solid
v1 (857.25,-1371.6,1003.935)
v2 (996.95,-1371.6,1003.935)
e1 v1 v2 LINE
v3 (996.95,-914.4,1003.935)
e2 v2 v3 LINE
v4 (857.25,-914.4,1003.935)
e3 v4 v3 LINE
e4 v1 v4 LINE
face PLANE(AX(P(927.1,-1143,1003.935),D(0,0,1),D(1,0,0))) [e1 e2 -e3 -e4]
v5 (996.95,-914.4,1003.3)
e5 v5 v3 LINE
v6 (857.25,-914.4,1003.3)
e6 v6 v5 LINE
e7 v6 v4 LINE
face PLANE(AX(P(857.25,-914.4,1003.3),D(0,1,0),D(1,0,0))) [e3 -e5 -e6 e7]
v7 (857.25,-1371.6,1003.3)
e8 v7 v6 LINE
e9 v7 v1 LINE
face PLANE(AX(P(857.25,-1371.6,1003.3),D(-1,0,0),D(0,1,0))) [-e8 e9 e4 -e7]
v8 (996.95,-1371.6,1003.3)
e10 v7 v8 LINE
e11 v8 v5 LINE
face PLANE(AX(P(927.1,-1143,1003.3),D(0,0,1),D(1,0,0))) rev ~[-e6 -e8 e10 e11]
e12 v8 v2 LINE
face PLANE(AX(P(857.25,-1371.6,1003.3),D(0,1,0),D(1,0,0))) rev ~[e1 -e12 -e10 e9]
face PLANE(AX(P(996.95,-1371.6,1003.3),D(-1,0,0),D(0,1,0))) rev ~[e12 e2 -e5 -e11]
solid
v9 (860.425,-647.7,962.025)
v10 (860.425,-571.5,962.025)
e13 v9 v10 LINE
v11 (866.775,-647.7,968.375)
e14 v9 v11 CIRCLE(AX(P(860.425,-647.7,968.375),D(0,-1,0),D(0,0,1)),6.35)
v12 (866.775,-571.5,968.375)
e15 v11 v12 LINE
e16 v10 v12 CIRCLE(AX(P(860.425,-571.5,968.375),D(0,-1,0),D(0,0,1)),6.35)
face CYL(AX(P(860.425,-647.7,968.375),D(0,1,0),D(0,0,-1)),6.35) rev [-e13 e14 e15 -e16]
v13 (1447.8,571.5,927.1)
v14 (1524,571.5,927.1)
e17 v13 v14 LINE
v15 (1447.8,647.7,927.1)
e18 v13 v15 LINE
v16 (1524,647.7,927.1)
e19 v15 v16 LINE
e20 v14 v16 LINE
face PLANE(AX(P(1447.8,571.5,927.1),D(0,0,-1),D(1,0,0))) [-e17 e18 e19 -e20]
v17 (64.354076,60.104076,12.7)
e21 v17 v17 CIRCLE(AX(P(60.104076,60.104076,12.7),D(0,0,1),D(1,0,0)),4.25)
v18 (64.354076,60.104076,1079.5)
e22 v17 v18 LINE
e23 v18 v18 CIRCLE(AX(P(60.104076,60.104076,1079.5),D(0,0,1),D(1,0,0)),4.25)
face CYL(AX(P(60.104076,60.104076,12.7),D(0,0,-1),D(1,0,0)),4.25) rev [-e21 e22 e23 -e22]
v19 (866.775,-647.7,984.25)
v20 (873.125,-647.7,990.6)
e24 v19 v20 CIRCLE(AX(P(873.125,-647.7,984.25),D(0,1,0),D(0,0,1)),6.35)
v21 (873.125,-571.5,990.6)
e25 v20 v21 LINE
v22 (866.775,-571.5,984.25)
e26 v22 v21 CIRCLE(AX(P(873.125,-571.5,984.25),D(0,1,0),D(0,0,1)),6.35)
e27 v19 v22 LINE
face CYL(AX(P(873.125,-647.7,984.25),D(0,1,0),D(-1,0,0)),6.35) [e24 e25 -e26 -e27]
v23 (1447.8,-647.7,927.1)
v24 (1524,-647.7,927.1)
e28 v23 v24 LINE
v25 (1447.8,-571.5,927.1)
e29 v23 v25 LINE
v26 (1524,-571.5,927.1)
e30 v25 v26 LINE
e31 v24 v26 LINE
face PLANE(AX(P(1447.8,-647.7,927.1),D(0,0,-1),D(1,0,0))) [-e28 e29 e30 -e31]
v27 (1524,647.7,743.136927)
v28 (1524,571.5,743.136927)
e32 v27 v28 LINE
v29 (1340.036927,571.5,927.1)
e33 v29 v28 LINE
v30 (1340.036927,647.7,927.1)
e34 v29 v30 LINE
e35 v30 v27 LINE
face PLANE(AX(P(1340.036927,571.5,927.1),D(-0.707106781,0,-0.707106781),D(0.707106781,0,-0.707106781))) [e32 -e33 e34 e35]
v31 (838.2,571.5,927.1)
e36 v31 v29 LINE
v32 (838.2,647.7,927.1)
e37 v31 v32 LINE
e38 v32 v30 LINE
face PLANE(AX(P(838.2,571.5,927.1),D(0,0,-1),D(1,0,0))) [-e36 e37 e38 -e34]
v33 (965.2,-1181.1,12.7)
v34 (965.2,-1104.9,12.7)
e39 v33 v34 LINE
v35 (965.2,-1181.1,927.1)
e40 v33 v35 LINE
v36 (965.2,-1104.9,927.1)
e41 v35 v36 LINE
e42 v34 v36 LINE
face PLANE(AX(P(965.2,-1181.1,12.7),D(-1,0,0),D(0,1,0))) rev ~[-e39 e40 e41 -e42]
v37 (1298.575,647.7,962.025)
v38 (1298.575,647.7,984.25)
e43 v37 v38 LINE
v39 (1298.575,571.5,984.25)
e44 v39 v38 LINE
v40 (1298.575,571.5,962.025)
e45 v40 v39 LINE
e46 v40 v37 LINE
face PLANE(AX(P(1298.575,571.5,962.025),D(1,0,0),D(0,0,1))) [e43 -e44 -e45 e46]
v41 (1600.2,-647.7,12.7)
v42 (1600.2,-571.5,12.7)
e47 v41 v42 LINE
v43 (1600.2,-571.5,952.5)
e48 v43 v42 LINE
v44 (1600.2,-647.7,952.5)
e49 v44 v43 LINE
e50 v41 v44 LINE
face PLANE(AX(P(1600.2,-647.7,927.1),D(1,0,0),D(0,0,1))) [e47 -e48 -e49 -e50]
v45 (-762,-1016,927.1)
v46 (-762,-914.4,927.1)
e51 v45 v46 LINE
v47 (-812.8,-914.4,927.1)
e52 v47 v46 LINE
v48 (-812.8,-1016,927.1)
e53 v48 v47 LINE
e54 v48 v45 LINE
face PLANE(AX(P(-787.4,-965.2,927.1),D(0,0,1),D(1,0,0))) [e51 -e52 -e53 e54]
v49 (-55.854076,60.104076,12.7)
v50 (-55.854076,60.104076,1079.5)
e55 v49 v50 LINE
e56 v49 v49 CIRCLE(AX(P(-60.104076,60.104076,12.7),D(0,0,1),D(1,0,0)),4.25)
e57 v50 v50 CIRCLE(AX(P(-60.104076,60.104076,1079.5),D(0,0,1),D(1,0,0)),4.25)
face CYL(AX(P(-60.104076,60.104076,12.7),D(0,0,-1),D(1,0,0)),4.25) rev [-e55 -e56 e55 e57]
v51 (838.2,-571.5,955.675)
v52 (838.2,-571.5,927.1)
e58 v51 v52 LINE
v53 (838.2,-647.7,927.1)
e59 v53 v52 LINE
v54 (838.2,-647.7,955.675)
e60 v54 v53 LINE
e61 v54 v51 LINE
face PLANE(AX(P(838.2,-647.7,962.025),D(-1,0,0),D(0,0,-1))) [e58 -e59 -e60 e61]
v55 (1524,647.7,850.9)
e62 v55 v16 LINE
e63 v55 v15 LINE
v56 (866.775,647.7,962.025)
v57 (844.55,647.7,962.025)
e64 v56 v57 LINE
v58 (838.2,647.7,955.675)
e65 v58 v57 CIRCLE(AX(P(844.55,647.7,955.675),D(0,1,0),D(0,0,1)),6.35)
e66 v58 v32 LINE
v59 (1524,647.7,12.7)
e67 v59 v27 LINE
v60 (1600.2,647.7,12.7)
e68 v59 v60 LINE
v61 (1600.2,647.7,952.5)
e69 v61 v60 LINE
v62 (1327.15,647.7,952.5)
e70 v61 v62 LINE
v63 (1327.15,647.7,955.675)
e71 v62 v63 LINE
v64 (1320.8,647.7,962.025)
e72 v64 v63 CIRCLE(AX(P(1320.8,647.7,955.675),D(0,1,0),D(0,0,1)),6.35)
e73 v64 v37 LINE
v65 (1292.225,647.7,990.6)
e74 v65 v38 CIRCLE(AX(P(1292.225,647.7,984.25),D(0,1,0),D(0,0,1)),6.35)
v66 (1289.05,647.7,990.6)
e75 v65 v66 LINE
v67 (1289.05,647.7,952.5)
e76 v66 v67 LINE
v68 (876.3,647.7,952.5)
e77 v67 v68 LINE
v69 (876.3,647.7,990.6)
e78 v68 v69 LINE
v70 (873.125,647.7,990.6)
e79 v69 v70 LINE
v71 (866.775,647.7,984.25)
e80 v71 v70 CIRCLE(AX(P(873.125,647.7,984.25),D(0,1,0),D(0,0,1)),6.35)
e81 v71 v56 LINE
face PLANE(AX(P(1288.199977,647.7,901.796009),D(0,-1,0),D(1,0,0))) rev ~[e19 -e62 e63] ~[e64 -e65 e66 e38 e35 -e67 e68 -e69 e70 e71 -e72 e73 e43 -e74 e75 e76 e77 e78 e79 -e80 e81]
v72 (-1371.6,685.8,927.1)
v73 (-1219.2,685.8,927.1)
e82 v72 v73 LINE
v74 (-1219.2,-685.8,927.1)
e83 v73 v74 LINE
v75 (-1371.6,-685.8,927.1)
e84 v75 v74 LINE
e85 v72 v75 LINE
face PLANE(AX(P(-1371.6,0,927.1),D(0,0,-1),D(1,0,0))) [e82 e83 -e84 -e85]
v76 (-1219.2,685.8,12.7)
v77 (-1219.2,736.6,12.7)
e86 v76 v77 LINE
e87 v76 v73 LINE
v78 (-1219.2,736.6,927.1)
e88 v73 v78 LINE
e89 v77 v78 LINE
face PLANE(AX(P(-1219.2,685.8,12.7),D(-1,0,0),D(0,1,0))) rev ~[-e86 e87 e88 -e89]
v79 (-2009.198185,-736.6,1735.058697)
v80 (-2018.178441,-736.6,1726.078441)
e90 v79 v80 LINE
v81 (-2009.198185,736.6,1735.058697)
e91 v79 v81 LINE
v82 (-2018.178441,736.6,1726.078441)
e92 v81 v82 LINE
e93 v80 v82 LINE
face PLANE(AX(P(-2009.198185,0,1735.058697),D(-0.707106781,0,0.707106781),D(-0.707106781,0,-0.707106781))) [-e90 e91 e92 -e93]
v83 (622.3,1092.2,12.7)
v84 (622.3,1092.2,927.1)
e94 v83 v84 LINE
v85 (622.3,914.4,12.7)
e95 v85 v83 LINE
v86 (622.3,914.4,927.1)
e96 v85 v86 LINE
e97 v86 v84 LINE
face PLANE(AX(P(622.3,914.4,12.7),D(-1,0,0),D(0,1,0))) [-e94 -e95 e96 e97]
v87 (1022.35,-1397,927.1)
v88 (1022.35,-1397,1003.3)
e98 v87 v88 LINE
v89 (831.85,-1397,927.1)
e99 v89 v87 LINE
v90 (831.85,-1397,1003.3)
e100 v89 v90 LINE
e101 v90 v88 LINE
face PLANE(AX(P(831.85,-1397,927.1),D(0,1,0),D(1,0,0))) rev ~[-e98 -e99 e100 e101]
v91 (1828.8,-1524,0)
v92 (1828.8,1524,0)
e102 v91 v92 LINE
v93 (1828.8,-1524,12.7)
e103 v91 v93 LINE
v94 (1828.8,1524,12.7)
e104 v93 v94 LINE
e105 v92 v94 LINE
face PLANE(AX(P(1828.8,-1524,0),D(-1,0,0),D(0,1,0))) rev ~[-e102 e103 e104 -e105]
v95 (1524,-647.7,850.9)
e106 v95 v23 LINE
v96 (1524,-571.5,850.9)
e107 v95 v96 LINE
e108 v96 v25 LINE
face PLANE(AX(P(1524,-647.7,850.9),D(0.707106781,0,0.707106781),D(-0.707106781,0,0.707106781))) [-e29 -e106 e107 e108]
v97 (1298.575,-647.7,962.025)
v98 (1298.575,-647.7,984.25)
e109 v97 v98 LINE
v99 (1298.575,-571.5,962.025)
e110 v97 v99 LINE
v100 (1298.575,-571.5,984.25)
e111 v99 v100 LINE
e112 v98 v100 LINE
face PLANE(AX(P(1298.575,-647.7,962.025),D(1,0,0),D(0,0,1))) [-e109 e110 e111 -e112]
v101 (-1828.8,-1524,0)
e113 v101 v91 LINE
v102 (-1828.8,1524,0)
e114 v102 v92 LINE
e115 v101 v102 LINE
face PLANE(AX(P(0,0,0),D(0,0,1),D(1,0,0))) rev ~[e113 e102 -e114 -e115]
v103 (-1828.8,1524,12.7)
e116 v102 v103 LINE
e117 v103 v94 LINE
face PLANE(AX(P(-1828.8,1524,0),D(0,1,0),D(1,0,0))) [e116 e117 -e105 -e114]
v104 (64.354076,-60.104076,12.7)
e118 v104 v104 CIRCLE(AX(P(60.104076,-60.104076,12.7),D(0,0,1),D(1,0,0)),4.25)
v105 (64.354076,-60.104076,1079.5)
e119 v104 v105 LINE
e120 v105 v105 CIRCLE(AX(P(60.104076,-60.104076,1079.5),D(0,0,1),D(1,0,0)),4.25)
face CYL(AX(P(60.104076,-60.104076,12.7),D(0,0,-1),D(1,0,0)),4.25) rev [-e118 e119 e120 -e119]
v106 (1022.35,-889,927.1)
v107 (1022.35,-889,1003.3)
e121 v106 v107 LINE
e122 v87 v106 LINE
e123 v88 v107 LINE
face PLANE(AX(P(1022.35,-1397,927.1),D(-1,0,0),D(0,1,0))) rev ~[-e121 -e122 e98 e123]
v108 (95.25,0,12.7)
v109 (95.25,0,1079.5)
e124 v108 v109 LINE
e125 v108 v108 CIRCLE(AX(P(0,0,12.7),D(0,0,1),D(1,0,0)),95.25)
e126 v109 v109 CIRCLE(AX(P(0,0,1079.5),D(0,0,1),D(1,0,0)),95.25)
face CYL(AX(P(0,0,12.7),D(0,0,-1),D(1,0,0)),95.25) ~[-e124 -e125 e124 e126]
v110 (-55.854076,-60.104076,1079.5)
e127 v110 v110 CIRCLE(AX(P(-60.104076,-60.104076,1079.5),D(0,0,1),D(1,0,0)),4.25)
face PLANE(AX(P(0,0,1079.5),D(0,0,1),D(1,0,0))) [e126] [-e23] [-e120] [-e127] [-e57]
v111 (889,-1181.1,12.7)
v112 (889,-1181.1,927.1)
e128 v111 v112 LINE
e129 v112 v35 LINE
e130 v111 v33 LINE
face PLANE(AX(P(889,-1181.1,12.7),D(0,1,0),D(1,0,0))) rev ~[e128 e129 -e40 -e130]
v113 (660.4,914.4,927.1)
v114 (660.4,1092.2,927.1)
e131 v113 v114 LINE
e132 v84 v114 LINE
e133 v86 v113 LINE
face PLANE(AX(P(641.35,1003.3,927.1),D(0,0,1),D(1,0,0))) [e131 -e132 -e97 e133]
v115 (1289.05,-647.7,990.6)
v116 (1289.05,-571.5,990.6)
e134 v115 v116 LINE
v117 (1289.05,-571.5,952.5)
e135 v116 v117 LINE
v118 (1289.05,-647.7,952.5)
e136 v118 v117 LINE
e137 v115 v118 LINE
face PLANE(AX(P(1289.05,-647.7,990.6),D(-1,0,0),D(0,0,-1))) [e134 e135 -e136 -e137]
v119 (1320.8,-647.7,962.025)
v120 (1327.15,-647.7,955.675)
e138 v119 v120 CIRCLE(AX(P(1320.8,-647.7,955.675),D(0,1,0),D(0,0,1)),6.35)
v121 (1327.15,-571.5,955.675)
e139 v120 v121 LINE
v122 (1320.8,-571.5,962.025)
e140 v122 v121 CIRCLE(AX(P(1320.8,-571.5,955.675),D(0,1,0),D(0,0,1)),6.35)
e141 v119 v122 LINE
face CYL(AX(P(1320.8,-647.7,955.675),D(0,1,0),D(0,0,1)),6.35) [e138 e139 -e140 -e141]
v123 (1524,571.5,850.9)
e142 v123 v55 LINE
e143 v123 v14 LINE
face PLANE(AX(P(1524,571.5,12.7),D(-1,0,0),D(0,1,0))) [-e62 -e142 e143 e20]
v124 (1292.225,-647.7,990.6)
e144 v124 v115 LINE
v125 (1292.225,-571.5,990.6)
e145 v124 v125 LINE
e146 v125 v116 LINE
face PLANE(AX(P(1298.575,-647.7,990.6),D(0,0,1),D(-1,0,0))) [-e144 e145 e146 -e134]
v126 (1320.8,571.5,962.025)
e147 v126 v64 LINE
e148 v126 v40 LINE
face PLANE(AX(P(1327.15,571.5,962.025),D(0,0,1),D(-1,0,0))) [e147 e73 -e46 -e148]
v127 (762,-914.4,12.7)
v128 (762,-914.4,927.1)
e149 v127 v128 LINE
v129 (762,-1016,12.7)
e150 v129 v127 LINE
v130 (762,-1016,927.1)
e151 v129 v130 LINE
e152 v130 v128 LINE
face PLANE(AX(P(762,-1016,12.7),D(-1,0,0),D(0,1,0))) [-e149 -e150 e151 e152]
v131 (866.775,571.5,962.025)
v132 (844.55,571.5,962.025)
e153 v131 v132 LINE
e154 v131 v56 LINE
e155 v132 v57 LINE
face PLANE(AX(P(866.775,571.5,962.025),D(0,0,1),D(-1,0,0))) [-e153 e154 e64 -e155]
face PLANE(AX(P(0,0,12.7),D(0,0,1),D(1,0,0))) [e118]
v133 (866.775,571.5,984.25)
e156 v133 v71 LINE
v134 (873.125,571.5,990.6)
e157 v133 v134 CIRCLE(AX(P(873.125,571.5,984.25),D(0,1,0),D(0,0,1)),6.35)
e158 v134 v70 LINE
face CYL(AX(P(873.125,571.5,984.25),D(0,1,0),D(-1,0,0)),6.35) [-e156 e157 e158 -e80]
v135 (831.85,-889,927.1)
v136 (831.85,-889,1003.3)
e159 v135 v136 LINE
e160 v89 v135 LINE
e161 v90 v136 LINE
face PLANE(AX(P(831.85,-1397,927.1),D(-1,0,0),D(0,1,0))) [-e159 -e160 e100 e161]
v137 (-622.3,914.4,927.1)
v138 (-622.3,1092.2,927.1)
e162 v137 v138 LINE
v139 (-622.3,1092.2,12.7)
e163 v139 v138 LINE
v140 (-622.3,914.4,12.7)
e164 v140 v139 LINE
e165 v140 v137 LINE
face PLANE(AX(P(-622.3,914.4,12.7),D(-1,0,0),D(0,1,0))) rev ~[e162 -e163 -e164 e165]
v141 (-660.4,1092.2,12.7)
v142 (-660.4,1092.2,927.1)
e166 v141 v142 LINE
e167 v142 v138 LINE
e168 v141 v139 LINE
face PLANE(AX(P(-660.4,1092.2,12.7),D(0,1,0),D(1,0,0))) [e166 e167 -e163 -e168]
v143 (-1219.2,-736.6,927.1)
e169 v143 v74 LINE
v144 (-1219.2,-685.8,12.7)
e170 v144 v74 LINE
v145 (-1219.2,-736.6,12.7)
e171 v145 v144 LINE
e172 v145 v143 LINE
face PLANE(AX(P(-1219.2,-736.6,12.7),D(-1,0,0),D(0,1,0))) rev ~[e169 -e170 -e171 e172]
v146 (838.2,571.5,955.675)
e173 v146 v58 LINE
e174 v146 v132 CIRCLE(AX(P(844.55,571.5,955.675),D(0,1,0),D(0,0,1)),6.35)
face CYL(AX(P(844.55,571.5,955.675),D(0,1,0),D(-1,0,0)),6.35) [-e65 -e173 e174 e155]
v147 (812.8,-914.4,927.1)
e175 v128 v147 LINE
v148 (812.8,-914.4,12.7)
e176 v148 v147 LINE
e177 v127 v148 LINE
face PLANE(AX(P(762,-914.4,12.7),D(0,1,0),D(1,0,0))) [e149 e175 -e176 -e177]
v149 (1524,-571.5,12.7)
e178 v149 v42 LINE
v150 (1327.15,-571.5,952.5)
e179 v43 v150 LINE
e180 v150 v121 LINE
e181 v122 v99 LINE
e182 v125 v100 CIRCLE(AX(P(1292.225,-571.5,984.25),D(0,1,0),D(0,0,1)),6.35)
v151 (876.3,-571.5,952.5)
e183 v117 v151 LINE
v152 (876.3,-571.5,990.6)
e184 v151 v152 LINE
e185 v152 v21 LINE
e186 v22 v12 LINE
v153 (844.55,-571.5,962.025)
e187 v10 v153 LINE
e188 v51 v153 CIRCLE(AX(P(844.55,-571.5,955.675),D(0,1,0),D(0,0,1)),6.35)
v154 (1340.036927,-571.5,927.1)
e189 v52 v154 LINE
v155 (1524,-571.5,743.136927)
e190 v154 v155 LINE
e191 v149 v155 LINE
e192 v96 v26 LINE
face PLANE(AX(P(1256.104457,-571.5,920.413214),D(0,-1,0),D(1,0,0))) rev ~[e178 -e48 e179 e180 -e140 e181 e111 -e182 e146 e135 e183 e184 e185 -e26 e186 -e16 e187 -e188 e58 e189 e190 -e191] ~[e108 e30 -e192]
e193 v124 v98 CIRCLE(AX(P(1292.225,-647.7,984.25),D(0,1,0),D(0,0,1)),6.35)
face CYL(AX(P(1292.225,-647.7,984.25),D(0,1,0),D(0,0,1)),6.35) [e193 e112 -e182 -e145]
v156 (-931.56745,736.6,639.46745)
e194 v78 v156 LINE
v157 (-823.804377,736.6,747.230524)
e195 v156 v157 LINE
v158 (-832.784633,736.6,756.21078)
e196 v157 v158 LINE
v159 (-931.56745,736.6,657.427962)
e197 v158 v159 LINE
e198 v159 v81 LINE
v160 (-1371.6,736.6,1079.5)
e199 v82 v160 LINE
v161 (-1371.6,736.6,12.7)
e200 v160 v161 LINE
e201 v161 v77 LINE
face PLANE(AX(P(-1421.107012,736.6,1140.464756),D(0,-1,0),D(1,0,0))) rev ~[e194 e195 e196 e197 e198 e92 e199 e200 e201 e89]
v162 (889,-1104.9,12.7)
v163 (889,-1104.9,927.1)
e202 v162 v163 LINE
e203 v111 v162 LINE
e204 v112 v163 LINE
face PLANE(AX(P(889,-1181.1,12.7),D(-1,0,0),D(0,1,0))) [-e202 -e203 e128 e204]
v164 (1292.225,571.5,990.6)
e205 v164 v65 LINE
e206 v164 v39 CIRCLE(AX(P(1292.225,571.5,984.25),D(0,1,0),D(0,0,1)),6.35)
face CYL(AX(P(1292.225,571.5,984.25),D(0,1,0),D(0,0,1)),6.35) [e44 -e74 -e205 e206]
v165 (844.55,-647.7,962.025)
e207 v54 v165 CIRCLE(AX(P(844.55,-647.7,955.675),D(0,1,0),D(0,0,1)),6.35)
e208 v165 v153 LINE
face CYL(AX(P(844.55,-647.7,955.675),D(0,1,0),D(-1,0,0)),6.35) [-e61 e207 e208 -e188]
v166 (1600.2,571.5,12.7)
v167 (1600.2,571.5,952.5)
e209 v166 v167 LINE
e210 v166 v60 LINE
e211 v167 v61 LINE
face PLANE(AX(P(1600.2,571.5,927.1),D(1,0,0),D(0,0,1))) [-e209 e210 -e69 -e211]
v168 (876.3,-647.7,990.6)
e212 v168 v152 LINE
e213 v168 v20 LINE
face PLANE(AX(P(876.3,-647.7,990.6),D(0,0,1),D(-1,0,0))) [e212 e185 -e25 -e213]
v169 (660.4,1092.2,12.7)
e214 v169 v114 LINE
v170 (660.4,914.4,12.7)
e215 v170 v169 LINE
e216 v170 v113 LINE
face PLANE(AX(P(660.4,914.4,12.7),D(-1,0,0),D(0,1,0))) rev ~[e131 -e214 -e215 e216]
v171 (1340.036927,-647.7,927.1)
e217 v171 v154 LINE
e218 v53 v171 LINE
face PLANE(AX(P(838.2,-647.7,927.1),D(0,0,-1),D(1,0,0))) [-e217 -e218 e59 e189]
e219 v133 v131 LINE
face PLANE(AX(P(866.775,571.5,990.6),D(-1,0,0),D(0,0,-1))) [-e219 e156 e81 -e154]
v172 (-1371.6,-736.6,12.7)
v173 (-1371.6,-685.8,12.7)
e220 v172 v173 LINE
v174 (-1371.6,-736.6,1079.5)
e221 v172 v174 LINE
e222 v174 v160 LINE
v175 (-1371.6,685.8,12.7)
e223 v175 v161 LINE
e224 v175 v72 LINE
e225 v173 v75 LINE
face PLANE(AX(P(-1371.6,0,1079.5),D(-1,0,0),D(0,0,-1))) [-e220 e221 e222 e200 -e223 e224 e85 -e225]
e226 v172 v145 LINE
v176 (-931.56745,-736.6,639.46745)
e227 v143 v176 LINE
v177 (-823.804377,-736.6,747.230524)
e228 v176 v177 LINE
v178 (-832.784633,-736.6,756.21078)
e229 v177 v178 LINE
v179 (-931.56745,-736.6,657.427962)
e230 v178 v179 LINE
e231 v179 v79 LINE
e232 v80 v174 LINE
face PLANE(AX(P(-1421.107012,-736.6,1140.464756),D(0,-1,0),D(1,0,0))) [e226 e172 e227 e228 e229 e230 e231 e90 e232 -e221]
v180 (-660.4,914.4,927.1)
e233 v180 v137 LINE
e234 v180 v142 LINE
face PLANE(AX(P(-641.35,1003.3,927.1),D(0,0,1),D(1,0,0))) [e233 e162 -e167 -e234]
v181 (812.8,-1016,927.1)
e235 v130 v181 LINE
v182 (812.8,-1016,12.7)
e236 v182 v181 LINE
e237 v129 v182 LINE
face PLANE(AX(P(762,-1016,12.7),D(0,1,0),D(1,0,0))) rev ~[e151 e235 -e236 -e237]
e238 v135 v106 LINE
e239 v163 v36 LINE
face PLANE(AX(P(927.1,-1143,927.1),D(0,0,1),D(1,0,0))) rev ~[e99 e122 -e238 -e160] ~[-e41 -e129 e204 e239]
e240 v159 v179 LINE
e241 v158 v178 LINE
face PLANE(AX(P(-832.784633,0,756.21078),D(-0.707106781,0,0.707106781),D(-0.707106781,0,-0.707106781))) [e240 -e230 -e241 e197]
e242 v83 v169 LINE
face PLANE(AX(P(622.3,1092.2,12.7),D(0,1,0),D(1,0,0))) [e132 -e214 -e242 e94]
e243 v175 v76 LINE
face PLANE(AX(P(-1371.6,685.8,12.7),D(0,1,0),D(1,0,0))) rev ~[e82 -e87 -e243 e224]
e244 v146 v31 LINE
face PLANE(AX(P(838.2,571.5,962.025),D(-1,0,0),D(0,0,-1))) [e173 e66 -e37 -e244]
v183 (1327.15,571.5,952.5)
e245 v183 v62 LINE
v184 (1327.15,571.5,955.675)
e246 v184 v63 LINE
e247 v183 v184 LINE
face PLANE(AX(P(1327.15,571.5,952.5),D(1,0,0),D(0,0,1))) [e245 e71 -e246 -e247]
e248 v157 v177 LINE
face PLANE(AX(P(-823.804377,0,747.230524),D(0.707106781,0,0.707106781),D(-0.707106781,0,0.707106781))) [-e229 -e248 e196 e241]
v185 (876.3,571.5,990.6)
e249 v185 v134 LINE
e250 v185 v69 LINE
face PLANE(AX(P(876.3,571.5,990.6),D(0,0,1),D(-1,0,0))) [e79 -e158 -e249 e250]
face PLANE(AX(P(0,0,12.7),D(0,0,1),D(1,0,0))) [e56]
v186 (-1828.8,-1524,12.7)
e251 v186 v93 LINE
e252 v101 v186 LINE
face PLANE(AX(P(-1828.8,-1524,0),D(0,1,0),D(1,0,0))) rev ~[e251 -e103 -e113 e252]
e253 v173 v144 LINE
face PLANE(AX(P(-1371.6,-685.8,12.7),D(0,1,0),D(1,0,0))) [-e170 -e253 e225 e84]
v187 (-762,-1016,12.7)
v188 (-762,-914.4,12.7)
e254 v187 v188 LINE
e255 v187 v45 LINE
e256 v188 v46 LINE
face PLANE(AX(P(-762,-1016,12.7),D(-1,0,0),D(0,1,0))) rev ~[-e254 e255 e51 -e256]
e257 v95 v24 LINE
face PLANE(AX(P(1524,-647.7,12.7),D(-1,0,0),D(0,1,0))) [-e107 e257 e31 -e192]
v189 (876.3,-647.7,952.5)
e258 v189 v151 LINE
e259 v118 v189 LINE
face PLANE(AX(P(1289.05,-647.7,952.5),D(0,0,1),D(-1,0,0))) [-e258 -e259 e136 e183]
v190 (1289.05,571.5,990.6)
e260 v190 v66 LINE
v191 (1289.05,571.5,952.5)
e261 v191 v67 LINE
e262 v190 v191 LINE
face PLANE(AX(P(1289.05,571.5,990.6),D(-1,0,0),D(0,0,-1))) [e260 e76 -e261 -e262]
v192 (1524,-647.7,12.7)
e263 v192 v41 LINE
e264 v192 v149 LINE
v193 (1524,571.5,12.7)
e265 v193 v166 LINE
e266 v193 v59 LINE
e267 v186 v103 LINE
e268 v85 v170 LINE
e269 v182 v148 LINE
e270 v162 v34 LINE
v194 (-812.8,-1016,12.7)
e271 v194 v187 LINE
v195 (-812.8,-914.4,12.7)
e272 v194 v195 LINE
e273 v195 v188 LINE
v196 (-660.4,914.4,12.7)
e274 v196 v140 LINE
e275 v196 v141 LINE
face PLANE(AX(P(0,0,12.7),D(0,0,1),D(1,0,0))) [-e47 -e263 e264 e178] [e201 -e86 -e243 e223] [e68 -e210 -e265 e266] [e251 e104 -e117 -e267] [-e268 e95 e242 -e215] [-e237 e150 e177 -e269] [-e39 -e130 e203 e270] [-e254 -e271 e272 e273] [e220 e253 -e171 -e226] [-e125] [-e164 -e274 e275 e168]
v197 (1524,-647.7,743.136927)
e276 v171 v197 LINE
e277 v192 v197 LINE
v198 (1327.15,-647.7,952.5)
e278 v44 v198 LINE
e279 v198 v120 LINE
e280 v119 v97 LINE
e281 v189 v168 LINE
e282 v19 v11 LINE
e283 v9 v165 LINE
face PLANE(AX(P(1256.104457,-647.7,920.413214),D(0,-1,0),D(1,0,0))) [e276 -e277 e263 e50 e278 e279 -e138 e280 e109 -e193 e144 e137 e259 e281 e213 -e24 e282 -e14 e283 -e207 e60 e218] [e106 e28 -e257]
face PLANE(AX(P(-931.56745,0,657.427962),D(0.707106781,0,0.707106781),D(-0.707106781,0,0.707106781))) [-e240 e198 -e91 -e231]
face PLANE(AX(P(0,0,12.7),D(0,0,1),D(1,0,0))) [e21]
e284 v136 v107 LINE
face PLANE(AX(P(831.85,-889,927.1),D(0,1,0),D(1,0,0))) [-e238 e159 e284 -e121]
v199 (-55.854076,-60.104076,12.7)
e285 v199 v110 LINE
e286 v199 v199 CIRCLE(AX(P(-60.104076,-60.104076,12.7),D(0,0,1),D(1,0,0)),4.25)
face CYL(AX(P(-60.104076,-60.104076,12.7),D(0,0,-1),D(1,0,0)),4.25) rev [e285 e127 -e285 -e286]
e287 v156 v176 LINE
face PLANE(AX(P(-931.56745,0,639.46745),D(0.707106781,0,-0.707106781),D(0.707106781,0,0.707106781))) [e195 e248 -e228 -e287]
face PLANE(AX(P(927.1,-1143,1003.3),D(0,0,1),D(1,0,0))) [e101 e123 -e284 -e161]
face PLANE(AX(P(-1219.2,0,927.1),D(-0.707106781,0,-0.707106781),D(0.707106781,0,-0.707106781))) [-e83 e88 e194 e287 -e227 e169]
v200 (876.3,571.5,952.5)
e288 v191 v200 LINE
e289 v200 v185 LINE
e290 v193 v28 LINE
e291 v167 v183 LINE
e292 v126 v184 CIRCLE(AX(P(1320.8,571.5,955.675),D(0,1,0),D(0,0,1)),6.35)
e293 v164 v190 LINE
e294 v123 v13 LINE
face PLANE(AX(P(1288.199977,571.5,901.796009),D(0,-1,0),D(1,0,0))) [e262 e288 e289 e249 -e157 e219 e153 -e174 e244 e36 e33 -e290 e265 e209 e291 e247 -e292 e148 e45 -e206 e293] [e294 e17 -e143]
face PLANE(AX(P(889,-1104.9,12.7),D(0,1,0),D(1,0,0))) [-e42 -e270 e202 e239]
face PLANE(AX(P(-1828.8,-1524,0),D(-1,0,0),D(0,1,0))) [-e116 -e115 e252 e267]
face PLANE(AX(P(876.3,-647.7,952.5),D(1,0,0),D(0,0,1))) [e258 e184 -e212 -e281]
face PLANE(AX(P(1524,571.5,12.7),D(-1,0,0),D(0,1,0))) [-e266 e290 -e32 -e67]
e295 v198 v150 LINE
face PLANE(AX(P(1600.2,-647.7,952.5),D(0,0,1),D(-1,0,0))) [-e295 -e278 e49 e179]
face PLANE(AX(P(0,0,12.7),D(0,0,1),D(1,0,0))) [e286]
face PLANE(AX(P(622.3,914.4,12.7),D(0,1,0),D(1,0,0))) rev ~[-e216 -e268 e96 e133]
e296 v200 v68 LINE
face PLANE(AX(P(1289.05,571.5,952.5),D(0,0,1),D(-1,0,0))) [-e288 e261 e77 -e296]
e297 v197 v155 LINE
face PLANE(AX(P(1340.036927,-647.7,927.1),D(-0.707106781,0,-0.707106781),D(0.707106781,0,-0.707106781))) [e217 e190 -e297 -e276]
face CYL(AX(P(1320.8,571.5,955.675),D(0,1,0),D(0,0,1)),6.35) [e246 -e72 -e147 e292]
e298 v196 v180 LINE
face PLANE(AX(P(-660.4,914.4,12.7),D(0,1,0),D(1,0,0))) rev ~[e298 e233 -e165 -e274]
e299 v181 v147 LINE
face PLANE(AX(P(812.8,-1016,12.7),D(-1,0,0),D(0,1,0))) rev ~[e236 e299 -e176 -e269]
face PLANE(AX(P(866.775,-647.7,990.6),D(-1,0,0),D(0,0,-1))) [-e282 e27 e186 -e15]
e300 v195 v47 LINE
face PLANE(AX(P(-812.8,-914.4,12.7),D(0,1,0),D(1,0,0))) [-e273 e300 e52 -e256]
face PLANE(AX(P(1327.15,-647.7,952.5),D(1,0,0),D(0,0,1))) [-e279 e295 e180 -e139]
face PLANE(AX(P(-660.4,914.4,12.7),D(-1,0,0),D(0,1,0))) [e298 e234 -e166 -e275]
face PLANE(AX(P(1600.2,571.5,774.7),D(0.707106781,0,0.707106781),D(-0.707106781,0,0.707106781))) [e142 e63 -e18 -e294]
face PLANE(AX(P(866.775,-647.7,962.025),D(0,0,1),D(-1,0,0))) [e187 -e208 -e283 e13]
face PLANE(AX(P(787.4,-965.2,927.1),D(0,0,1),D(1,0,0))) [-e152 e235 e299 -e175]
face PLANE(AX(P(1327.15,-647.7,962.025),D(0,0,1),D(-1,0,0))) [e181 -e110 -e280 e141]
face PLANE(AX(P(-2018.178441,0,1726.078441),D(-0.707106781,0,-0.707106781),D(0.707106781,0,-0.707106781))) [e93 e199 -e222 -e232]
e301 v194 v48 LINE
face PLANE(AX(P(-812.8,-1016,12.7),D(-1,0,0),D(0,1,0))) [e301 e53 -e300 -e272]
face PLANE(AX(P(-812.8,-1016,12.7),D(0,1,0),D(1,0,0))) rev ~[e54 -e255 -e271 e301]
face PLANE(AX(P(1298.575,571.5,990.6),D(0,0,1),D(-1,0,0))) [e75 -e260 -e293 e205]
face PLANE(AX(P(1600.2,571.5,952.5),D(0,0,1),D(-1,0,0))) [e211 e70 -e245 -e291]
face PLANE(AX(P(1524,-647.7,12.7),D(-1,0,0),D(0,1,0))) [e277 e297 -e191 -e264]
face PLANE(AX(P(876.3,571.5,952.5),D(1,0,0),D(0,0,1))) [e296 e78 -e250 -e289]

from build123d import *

# Parameters (mm, degrees)
F0_W          = 3657.6
F0_H          = 3048
F1_DEPTH      = 12.7
F2_R          = 95.25
F2_R_2        = 4.25
F3_DEPTH      = 1066.8
F4_W          = 38.1
F4_H          = 177.8
F4_W_2        = 50.8
F4_H_2        = 101.6
F4_W_3        = 76.2
F4_H_3        = 76.2
F5_DEPTH      = 914.4
F6_W          = 152.4
F6_H          = 50.8
F7_DEPTH      = 914.4
F9_DEPTH      = 736.6
F9_DEPTH_BACK = 736.6
F11_DEPTH     = 76.2
F13_DEPTH     = 76.2
F14_R         = 6.35
F15_W         = 190.5
F15_H         = 508
F16_DEPTH     = 76.2
F17_W         = 139.7
F17_H         = 457.2
F18_DEPTH     = 0.635


with BuildPart() as f1:
    # F0 (on Top) → F1 (new body)
    with BuildSketch(Plane.XY):
        Rectangle(F0_W, F0_H)
    extrude(amount=F1_DEPTH)

    # F2 (on face) → F3 (join)
    with BuildSketch(Plane.XY.offset(12.7)):
        Circle(F2_R)
        with Locations((-60.1040764009, -60.1040764009)):
            Circle(F2_R_2, mode=Mode.SUBTRACT)
        with Locations((60.1040764009, -60.1040764009)):
            Circle(F2_R_2, mode=Mode.SUBTRACT)
        with Locations((-60.1040764009, 60.1040764009)):
            Circle(F2_R_2, mode=Mode.SUBTRACT)
        with Locations((60.1040764009, 60.1040764009)):
            Circle(F2_R_2, mode=Mode.SUBTRACT)
    extrude(amount=F3_DEPTH)

    # F4 (on face) → F5 (join)
    with BuildSketch(Plane.XY.offset(12.7)):
        with Locations((-641.35, 1003.3)):
            Rectangle(F4_W, F4_H)
        with Locations((641.35, 1003.3)):
            Rectangle(F4_W, F4_H)
        with Locations((-787.4, -965.2)):
            Rectangle(F4_W_2, F4_H_2)
        with Locations((787.4, -965.2)):
            Rectangle(F4_W_2, F4_H_2)
        with Locations((1562.1, 609.6)):
            Rectangle(F4_W_3, F4_H_3)
        with Locations((1562.1, -609.6)):
            Rectangle(F4_W_3, F4_H_3)
        with Locations((927.1, -1143)):
            Rectangle(F4_W_3, F4_H_3)
    extrude(amount=F5_DEPTH)

    # F6 (on face) → F7 (join)
    with BuildSketch(Plane.XY.offset(12.7)):
        with Locations((-1295.4, 711.2)):
            Rectangle(F6_W, F6_H)
        with Locations((-1295.4, -711.2)):
            Rectangle(F6_W, F6_H)
    extrude(amount=F7_DEPTH)

    # F8 (on Front) → F9 (join, two sides)
    with BuildSketch(Plane.XZ) as f9_sk:
        Polygon((-1371.6, 1079.5), (-1371.6, 927.1), (-1219.2, 927.1), (-931.5674500676, 639.4674500676), (-823.8043766148, 747.2305235204), (-832.7846327359, 756.2107796415), (-931.5674500676, 657.4279623097), (-2009.1981845959, 1735.058696838), (-2018.178440717, 1726.078440717), align=None)
    extrude(amount=F9_DEPTH)
    extrude(f9_sk.sketch, amount=-F9_DEPTH_BACK)

    # F10 (on face) → F11 (join, through all)
    with BuildSketch(Plane.XZ.offset(647.7)):
        Polygon((1447.8, 927.1), (1600.2, 927.1), (1600.2, 952.5), (1327.15, 952.5), (1327.15, 962.025), (1298.575, 962.025), (1298.575, 990.6), (1289.05, 990.6), (1289.05, 952.5), (876.3, 952.5), (876.3, 990.6), (866.775, 990.6), (866.775, 962.025), (838.2, 962.025), (838.2, 927.1), (1340.0369265472, 927.1), (1524, 743.1369265472), (1524, 850.9), align=None)
    extrude(amount=-F11_DEPTH)

    # F12 (on face) → F13 (join, through all)
    with BuildSketch(Plane.XZ.offset(-571.5)):
        Polygon((1447.8, 927.1), (1600.2, 927.1), (1600.2, 952.5), (1327.15, 952.5), (1327.15, 962.025), (1298.575, 962.025), (1298.575, 990.6), (1289.05, 990.6), (1289.05, 952.5), (876.3, 952.5), (876.3, 990.6), (866.775, 990.6), (866.775, 962.025), (838.2, 962.025), (838.2, 927.1), (1340.0369265472, 927.1), (1600.2, 666.9369265472), (1600.2, 774.7), align=None)
    extrude(amount=-F13_DEPTH)

    # F14
    f14_edges = [f1.edges().sort_by_distance(p)[0] for p in [
        (866.775, -609.6, 990.6),
        (1298.575, -609.6, 990.6),
        (1327.15, -609.6, 962.025),
        (866.775, 609.6, 990.6),
        (838.2, 609.6, 962.025),
        (1298.575, 609.6, 990.6),
        (1327.15, 609.6, 962.025),
        (866.775, -609.6, 962.025),
        (838.2, -609.6, 962.025),
    ]]
    fillet(f14_edges, radius=F14_R)

    # F15 (on face) → F16 (join)
    with BuildSketch(Plane.XY.offset(927.1)):
        with Locations((927.1, -1143)):
            Rectangle(F15_W, F15_H)
    extrude(amount=F16_DEPTH)


with BuildPart() as f18:
    # F17 (on face) → F18 (new body)
    with BuildSketch(Plane.XY.offset(1003.3)):
        with Locations((927.1, -1143)):
            Rectangle(F17_W, F17_H)
    extrude(amount=F18_DEPTH)


solid = Compound([f1.part, f18.part])
